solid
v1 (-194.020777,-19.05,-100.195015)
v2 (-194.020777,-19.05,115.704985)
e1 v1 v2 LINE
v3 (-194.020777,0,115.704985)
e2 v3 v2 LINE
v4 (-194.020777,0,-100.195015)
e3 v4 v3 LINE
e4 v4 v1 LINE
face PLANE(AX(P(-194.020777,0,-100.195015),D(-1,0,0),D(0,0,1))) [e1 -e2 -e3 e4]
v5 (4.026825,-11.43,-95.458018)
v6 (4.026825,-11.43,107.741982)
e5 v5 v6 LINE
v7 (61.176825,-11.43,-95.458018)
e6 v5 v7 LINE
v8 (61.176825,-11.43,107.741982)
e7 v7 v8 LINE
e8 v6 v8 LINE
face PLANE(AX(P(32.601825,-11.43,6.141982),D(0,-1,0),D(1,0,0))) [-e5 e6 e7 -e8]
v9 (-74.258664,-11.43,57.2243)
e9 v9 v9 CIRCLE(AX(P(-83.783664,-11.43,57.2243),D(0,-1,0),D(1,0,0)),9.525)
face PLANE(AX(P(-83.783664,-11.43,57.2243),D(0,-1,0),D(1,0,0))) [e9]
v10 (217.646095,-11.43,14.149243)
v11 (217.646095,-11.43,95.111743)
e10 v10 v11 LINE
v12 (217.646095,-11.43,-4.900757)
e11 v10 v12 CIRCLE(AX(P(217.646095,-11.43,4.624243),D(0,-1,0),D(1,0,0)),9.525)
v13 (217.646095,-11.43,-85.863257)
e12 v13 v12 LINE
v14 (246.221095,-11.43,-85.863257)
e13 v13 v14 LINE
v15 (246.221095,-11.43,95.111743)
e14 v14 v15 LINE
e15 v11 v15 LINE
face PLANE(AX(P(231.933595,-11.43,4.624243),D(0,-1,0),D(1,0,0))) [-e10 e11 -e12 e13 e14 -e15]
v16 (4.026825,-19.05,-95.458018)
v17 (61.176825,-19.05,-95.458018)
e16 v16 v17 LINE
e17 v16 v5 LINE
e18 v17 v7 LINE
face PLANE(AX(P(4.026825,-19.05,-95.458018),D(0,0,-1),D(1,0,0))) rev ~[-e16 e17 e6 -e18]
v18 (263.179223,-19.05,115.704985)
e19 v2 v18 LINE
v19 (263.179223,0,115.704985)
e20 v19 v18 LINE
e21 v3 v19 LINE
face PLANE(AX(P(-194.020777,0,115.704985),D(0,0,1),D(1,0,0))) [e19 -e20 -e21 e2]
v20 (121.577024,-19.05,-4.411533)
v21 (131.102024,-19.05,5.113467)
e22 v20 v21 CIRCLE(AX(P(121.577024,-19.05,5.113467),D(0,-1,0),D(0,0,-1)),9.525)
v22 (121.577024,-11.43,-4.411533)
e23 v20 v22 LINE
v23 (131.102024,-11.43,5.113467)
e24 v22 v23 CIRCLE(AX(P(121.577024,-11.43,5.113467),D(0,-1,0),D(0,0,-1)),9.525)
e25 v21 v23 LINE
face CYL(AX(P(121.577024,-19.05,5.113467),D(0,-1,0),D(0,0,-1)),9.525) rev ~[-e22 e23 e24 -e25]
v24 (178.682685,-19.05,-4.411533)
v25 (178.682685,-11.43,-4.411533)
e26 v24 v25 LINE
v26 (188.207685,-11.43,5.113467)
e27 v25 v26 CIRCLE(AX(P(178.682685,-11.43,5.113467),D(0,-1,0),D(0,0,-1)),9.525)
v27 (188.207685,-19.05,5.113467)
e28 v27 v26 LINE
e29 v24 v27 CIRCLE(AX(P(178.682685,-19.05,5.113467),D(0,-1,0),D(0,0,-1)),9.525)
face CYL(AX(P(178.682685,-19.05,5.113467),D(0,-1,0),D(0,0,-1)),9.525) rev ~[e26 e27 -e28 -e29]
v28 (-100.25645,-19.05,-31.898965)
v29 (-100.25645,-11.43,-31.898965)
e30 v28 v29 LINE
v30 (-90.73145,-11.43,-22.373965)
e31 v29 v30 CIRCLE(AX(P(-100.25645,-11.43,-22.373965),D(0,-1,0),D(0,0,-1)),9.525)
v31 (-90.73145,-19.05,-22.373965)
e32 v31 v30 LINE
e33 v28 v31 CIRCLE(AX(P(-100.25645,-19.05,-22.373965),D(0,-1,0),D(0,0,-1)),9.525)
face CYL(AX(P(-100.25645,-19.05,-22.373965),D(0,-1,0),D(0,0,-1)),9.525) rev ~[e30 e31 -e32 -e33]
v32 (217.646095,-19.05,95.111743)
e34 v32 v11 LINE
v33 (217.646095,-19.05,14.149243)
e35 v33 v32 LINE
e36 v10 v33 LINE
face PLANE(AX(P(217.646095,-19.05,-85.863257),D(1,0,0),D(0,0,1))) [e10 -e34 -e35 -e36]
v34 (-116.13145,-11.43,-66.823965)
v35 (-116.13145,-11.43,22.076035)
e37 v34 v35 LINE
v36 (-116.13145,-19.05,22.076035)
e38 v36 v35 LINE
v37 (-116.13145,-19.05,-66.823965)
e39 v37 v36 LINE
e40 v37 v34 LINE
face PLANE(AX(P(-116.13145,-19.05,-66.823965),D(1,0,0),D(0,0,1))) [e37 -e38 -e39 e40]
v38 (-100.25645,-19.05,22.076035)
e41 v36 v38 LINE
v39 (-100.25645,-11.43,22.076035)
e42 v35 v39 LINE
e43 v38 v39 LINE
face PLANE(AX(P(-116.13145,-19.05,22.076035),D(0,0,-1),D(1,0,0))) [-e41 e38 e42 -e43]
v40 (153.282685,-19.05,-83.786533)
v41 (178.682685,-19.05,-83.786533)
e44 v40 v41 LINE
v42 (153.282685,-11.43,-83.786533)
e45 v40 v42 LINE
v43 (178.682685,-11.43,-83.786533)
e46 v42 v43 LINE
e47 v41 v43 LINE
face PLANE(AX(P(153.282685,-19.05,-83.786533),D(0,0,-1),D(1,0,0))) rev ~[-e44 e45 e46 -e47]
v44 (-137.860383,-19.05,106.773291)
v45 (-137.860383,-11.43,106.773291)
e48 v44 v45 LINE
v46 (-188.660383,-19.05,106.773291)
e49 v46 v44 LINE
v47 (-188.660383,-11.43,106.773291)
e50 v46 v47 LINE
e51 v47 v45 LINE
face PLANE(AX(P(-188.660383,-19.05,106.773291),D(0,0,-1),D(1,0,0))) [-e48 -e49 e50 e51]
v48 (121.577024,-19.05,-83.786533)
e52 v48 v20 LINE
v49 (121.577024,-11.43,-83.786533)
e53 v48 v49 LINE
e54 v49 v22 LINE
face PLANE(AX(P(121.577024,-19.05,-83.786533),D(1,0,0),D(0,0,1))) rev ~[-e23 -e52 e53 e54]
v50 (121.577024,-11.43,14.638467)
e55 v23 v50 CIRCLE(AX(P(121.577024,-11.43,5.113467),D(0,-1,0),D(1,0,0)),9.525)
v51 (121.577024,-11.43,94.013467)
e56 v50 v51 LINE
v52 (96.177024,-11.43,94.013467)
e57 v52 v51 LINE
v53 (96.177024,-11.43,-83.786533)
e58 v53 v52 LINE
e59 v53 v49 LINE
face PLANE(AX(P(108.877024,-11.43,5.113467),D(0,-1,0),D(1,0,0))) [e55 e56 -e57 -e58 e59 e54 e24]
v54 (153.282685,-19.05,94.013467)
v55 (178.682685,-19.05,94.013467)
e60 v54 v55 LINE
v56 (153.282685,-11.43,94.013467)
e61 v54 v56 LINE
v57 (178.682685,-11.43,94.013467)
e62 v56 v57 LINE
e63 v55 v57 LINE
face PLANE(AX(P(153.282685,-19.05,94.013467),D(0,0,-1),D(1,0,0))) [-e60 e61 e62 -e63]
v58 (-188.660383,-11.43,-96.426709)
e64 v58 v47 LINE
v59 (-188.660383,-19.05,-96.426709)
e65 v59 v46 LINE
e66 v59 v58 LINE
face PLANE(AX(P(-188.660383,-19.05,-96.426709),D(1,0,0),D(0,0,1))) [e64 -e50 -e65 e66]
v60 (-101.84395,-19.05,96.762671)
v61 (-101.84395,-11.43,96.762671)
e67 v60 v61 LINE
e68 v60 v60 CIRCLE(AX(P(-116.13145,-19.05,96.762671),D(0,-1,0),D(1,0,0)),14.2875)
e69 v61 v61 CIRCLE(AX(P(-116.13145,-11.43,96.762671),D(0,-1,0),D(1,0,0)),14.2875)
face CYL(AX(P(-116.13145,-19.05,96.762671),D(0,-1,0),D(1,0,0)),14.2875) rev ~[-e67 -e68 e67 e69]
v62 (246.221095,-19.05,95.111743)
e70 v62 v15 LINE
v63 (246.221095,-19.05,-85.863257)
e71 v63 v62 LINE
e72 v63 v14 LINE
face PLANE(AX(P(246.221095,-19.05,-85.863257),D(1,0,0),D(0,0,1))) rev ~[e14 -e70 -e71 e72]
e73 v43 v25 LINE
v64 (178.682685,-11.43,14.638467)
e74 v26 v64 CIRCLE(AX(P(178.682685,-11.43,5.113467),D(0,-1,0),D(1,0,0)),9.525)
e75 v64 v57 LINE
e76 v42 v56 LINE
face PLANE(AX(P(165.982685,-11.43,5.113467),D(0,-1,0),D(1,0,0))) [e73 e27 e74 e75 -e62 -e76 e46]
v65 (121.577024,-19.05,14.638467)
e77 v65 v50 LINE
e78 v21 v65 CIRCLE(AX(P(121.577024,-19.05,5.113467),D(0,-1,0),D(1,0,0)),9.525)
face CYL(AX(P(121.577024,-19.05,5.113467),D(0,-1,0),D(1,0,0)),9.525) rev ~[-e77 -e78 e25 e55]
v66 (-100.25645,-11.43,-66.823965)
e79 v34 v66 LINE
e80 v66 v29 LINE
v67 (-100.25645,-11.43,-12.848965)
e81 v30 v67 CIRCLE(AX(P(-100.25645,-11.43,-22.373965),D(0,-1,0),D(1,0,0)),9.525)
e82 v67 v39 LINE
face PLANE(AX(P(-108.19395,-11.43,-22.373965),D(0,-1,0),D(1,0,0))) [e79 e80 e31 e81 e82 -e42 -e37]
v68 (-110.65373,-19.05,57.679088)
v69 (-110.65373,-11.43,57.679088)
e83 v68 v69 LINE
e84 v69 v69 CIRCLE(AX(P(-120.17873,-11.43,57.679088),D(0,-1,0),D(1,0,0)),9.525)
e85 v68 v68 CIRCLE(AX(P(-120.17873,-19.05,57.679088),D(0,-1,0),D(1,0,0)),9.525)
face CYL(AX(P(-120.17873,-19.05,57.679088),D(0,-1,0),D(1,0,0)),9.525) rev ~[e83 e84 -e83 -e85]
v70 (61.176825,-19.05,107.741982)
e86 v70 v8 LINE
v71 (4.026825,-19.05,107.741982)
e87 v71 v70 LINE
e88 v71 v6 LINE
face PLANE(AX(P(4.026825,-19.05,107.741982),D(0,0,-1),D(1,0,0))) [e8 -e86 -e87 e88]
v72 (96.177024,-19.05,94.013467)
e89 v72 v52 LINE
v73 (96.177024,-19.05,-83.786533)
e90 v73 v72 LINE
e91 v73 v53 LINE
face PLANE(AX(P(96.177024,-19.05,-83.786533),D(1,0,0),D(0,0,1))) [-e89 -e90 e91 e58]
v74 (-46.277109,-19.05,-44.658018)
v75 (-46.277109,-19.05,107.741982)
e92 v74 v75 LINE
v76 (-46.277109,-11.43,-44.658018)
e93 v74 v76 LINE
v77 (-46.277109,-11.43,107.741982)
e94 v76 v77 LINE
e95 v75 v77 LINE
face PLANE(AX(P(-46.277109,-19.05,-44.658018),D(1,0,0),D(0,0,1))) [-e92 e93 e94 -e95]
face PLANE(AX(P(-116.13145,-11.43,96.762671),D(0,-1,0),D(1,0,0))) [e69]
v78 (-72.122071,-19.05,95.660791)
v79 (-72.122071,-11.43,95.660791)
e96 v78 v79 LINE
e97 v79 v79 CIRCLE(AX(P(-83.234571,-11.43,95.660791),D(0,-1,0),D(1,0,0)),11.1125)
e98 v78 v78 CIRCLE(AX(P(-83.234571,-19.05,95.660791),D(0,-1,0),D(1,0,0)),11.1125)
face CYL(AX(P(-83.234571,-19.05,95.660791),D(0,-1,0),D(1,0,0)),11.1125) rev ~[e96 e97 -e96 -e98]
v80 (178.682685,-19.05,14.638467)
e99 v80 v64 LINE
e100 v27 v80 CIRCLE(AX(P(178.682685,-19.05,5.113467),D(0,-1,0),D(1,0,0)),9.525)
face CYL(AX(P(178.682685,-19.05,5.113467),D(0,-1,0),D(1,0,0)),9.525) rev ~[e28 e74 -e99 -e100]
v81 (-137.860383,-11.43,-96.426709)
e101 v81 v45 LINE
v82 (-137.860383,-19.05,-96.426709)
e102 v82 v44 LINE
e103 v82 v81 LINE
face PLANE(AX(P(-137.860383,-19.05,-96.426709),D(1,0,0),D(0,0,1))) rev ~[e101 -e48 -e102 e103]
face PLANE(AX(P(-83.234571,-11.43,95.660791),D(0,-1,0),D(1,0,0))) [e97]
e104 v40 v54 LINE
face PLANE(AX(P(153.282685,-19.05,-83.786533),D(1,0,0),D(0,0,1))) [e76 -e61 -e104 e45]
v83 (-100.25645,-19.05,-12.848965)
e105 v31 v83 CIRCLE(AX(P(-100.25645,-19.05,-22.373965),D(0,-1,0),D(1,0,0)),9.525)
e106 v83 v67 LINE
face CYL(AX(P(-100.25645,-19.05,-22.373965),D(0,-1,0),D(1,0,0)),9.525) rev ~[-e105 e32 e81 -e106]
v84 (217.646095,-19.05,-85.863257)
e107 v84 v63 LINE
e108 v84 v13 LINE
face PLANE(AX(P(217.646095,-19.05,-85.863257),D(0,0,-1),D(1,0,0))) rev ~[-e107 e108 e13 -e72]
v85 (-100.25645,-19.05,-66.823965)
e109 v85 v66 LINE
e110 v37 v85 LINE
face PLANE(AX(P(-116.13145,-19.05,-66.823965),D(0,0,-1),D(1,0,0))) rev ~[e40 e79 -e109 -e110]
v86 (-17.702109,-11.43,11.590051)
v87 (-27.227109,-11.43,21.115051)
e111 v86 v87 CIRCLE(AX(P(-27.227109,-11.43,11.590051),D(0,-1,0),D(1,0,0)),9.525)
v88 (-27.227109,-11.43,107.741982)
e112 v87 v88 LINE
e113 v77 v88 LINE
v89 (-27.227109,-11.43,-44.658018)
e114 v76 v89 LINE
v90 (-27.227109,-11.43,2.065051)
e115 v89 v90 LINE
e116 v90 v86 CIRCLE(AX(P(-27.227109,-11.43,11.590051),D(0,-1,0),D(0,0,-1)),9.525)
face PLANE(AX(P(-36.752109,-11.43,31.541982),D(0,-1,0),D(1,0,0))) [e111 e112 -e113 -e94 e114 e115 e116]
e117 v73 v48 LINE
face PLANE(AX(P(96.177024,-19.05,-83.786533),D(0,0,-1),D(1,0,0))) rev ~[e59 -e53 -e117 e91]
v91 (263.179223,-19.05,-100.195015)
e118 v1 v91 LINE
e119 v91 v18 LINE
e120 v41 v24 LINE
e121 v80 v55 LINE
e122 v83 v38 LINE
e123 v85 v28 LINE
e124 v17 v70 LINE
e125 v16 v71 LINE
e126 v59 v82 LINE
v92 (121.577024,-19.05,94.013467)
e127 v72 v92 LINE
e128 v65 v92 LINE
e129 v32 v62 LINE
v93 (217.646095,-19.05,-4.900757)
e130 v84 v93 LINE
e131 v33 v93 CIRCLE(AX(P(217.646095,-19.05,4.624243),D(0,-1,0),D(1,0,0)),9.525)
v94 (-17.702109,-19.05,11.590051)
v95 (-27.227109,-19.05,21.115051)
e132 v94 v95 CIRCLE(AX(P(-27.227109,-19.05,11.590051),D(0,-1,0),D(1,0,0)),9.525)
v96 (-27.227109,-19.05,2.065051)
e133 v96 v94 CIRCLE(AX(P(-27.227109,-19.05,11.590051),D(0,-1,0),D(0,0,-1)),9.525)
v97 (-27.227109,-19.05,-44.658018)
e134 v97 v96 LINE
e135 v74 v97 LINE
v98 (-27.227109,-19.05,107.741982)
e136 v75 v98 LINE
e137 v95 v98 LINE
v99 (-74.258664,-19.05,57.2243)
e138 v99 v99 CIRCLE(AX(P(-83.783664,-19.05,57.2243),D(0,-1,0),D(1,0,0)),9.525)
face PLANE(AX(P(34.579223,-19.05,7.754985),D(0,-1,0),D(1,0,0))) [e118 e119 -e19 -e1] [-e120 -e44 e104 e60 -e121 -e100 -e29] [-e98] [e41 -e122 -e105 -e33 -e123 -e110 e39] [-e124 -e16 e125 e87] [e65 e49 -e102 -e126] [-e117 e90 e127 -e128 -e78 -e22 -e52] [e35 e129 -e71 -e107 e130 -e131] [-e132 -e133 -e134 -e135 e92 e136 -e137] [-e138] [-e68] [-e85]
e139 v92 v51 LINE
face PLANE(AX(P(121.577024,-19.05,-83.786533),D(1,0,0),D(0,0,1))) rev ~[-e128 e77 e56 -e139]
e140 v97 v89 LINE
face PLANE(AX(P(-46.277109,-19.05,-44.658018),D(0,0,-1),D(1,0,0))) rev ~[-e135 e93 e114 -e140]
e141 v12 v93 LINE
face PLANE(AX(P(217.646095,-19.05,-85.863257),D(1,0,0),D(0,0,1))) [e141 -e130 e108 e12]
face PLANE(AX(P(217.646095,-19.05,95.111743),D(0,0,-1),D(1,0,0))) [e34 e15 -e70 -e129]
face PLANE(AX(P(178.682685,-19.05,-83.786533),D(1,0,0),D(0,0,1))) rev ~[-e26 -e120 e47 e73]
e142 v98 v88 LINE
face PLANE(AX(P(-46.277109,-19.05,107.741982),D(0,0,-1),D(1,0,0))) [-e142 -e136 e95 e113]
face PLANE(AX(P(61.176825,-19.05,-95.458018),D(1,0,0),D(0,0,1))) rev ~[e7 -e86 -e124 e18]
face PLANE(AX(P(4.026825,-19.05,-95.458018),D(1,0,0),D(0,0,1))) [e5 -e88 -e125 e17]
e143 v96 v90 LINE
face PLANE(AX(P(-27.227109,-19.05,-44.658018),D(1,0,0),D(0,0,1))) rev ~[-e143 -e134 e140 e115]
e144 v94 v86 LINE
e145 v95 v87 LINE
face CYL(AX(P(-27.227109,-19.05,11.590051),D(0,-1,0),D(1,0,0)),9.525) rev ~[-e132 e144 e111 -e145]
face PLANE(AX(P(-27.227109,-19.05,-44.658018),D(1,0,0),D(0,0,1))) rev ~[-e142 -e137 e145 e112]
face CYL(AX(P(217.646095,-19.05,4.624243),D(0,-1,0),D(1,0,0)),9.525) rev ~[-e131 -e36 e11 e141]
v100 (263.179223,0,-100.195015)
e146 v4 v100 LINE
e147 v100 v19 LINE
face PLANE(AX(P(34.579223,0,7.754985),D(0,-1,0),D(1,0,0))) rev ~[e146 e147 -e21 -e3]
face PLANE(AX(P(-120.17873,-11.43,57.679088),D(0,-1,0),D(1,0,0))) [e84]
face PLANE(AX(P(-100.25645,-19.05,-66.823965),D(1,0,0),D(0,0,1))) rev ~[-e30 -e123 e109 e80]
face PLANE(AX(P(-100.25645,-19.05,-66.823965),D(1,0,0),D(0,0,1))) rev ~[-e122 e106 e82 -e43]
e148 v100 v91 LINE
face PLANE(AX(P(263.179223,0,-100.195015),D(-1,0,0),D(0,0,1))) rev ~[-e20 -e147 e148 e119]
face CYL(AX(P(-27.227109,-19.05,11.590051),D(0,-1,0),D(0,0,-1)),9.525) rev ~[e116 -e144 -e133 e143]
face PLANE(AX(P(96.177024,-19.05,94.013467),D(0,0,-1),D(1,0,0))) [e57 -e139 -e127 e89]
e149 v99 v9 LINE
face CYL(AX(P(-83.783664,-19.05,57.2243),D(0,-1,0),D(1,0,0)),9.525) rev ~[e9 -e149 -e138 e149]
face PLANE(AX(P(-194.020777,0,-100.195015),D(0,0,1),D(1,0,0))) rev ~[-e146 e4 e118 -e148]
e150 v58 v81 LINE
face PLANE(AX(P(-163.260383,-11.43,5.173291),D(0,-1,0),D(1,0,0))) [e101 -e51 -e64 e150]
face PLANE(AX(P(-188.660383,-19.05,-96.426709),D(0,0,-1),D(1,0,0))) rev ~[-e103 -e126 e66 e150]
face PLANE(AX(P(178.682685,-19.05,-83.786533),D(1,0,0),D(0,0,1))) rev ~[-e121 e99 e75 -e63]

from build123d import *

# Parameters (mm, degrees)
F0_W     = 457.2
F0_H     = 215.9
F1_DEPTH = 19.05
F2_W     = 50.8
F2_H     = 203.2
F2_W_2   = 15.875
F2_H_2   = 88.9
F2_W_3   = 19.05
F2_H_3   = 152.4
F2_W_4   = 57.15
F2_W_5   = 25.4
F2_H_4   = 177.8
F2_W_6   = 28.575
F2_H_5   = 180.975
F2_R     = 14.2875
F2_R_2   = 11.1125
F2_R_3   = 9.525
F3_DEPTH = 7.62
F5_DEPTH = 7.62


# Not quite as in the source:
# - a length typed as a fraction of an inch, garbled in the dataset ("3 / 203.2 mm" for 3/8 in), is restored


with BuildPart() as f1:
    # F0 (on Front) → F1 (new body)
    with BuildSketch(Plane.XZ):
        with Locations((34.5792232292, 7.7549852431)):
            Rectangle(F0_W, F0_H)
    extrude(amount=F1_DEPTH)

    # F2 (on face) → F3 (cut)
    with BuildSketch(Plane.XZ.offset(19.05)):
        with Locations((-163.2603832245, 5.173290801)):
            Rectangle(F2_W, F2_H)
        with Locations((-108.1939504743, -22.3739650816)):
            Rectangle(F2_W_2, F2_H_2)
        with Locations((-36.7521092981, 31.5419817448)):
            Rectangle(F2_W_3, F2_H_3)
        with Locations((32.6018253148, 6.1419817448)):
            Rectangle(F2_W_4, F2_H)
        with Locations((108.8770244598, 5.1134674311)):
            Rectangle(F2_W_5, F2_H_4)
        with Locations((165.9826848984, 5.1134674311)):
            Rectangle(F2_W_5, F2_H_4)
        with Locations((231.9335953236, 4.6242426157)):
            Rectangle(F2_W_6, F2_H_5)
        with Locations((-116.1314504743, 96.762670864)):
            Circle(F2_R)
        with Locations((-83.2345709205, 95.660790801)):
            Circle(F2_R_2)
        with Locations((-83.7836638093, 57.2242997587)):
            Circle(F2_R_3)
        with Locations((-120.1787297428, 57.6790883665)):
            Circle(F2_R_3)
    extrude(amount=-F3_DEPTH, mode=Mode.SUBTRACT)

    # F4 (on face) → F5 (cut)
    with BuildSketch(Plane.XZ.offset(19.05)):
        with BuildLine():
            ThreePointArc((-100.2564504743, -31.8989650816), (-93.5212583835, -29.1091571724), (-90.7314504743, -22.3739650816))
            ThreePointArc((-90.7314504743, -22.3739650816), (-93.5212583835, -15.6387729908), (-100.2564504743, -12.8489650816))
            Line((-100.2564504743, -12.8489650816), (-100.2564504743, -31.8989650816))
        make_face()
        with BuildLine():
            ThreePointArc((-27.2271092981, 2.0650514647), (-20.4919172073, 4.8548593739), (-17.7021092981, 11.5900514647))
            ThreePointArc((-17.7021092981, 11.5900514647), (-20.4919172073, 18.3252435555), (-27.2271092981, 21.1150514647))
            Line((-27.2271092981, 21.1150514647), (-27.2271092981, 2.0650514647))
        make_face()
        with BuildLine():
            ThreePointArc((121.5770244598, -4.4115325689), (128.3122165506, -1.6217246597), (131.1020244598, 5.1134674311))
            ThreePointArc((131.1020244598, 5.1134674311), (128.3122165506, 11.8486595219), (121.5770244598, 14.6384674311))
            Line((121.5770244598, 14.6384674311), (121.5770244598, -4.4115325689))
        make_face()
        with BuildLine():
            ThreePointArc((178.6826848984, -4.4115325689), (185.4178769892, -1.6217246597), (188.2076848984, 5.1134674311))
            ThreePointArc((188.2076848984, 5.1134674311), (185.4178769892, 11.8486595219), (178.6826848984, 14.6384674311))
            Line((178.6826848984, 14.6384674311), (178.6826848984, -4.4115325689))
        make_face()
        with BuildLine():
            ThreePointArc((217.6460953236, -4.9007573843), (224.3812874144, -2.1109494751), (227.1710953236, 4.6242426157))
            ThreePointArc((227.1710953236, 4.6242426157), (224.3812874144, 11.3594347065), (217.6460953236, 14.1492426157))
            Line((217.6460953236, 14.1492426157), (217.6460953236, -4.9007573843))
        make_face()
        with BuildLine():
            Line((217.6460953236, -4.9007573843), (217.6460953236, 14.1492426157))
            ThreePointArc((217.6460953236, 14.1492426157), (208.1210953236, 4.6242426157), (217.6460953236, -4.9007573843))
        make_face()
    extrude(amount=-F5_DEPTH, mode=Mode.SUBTRACT)


solid = f1.part
